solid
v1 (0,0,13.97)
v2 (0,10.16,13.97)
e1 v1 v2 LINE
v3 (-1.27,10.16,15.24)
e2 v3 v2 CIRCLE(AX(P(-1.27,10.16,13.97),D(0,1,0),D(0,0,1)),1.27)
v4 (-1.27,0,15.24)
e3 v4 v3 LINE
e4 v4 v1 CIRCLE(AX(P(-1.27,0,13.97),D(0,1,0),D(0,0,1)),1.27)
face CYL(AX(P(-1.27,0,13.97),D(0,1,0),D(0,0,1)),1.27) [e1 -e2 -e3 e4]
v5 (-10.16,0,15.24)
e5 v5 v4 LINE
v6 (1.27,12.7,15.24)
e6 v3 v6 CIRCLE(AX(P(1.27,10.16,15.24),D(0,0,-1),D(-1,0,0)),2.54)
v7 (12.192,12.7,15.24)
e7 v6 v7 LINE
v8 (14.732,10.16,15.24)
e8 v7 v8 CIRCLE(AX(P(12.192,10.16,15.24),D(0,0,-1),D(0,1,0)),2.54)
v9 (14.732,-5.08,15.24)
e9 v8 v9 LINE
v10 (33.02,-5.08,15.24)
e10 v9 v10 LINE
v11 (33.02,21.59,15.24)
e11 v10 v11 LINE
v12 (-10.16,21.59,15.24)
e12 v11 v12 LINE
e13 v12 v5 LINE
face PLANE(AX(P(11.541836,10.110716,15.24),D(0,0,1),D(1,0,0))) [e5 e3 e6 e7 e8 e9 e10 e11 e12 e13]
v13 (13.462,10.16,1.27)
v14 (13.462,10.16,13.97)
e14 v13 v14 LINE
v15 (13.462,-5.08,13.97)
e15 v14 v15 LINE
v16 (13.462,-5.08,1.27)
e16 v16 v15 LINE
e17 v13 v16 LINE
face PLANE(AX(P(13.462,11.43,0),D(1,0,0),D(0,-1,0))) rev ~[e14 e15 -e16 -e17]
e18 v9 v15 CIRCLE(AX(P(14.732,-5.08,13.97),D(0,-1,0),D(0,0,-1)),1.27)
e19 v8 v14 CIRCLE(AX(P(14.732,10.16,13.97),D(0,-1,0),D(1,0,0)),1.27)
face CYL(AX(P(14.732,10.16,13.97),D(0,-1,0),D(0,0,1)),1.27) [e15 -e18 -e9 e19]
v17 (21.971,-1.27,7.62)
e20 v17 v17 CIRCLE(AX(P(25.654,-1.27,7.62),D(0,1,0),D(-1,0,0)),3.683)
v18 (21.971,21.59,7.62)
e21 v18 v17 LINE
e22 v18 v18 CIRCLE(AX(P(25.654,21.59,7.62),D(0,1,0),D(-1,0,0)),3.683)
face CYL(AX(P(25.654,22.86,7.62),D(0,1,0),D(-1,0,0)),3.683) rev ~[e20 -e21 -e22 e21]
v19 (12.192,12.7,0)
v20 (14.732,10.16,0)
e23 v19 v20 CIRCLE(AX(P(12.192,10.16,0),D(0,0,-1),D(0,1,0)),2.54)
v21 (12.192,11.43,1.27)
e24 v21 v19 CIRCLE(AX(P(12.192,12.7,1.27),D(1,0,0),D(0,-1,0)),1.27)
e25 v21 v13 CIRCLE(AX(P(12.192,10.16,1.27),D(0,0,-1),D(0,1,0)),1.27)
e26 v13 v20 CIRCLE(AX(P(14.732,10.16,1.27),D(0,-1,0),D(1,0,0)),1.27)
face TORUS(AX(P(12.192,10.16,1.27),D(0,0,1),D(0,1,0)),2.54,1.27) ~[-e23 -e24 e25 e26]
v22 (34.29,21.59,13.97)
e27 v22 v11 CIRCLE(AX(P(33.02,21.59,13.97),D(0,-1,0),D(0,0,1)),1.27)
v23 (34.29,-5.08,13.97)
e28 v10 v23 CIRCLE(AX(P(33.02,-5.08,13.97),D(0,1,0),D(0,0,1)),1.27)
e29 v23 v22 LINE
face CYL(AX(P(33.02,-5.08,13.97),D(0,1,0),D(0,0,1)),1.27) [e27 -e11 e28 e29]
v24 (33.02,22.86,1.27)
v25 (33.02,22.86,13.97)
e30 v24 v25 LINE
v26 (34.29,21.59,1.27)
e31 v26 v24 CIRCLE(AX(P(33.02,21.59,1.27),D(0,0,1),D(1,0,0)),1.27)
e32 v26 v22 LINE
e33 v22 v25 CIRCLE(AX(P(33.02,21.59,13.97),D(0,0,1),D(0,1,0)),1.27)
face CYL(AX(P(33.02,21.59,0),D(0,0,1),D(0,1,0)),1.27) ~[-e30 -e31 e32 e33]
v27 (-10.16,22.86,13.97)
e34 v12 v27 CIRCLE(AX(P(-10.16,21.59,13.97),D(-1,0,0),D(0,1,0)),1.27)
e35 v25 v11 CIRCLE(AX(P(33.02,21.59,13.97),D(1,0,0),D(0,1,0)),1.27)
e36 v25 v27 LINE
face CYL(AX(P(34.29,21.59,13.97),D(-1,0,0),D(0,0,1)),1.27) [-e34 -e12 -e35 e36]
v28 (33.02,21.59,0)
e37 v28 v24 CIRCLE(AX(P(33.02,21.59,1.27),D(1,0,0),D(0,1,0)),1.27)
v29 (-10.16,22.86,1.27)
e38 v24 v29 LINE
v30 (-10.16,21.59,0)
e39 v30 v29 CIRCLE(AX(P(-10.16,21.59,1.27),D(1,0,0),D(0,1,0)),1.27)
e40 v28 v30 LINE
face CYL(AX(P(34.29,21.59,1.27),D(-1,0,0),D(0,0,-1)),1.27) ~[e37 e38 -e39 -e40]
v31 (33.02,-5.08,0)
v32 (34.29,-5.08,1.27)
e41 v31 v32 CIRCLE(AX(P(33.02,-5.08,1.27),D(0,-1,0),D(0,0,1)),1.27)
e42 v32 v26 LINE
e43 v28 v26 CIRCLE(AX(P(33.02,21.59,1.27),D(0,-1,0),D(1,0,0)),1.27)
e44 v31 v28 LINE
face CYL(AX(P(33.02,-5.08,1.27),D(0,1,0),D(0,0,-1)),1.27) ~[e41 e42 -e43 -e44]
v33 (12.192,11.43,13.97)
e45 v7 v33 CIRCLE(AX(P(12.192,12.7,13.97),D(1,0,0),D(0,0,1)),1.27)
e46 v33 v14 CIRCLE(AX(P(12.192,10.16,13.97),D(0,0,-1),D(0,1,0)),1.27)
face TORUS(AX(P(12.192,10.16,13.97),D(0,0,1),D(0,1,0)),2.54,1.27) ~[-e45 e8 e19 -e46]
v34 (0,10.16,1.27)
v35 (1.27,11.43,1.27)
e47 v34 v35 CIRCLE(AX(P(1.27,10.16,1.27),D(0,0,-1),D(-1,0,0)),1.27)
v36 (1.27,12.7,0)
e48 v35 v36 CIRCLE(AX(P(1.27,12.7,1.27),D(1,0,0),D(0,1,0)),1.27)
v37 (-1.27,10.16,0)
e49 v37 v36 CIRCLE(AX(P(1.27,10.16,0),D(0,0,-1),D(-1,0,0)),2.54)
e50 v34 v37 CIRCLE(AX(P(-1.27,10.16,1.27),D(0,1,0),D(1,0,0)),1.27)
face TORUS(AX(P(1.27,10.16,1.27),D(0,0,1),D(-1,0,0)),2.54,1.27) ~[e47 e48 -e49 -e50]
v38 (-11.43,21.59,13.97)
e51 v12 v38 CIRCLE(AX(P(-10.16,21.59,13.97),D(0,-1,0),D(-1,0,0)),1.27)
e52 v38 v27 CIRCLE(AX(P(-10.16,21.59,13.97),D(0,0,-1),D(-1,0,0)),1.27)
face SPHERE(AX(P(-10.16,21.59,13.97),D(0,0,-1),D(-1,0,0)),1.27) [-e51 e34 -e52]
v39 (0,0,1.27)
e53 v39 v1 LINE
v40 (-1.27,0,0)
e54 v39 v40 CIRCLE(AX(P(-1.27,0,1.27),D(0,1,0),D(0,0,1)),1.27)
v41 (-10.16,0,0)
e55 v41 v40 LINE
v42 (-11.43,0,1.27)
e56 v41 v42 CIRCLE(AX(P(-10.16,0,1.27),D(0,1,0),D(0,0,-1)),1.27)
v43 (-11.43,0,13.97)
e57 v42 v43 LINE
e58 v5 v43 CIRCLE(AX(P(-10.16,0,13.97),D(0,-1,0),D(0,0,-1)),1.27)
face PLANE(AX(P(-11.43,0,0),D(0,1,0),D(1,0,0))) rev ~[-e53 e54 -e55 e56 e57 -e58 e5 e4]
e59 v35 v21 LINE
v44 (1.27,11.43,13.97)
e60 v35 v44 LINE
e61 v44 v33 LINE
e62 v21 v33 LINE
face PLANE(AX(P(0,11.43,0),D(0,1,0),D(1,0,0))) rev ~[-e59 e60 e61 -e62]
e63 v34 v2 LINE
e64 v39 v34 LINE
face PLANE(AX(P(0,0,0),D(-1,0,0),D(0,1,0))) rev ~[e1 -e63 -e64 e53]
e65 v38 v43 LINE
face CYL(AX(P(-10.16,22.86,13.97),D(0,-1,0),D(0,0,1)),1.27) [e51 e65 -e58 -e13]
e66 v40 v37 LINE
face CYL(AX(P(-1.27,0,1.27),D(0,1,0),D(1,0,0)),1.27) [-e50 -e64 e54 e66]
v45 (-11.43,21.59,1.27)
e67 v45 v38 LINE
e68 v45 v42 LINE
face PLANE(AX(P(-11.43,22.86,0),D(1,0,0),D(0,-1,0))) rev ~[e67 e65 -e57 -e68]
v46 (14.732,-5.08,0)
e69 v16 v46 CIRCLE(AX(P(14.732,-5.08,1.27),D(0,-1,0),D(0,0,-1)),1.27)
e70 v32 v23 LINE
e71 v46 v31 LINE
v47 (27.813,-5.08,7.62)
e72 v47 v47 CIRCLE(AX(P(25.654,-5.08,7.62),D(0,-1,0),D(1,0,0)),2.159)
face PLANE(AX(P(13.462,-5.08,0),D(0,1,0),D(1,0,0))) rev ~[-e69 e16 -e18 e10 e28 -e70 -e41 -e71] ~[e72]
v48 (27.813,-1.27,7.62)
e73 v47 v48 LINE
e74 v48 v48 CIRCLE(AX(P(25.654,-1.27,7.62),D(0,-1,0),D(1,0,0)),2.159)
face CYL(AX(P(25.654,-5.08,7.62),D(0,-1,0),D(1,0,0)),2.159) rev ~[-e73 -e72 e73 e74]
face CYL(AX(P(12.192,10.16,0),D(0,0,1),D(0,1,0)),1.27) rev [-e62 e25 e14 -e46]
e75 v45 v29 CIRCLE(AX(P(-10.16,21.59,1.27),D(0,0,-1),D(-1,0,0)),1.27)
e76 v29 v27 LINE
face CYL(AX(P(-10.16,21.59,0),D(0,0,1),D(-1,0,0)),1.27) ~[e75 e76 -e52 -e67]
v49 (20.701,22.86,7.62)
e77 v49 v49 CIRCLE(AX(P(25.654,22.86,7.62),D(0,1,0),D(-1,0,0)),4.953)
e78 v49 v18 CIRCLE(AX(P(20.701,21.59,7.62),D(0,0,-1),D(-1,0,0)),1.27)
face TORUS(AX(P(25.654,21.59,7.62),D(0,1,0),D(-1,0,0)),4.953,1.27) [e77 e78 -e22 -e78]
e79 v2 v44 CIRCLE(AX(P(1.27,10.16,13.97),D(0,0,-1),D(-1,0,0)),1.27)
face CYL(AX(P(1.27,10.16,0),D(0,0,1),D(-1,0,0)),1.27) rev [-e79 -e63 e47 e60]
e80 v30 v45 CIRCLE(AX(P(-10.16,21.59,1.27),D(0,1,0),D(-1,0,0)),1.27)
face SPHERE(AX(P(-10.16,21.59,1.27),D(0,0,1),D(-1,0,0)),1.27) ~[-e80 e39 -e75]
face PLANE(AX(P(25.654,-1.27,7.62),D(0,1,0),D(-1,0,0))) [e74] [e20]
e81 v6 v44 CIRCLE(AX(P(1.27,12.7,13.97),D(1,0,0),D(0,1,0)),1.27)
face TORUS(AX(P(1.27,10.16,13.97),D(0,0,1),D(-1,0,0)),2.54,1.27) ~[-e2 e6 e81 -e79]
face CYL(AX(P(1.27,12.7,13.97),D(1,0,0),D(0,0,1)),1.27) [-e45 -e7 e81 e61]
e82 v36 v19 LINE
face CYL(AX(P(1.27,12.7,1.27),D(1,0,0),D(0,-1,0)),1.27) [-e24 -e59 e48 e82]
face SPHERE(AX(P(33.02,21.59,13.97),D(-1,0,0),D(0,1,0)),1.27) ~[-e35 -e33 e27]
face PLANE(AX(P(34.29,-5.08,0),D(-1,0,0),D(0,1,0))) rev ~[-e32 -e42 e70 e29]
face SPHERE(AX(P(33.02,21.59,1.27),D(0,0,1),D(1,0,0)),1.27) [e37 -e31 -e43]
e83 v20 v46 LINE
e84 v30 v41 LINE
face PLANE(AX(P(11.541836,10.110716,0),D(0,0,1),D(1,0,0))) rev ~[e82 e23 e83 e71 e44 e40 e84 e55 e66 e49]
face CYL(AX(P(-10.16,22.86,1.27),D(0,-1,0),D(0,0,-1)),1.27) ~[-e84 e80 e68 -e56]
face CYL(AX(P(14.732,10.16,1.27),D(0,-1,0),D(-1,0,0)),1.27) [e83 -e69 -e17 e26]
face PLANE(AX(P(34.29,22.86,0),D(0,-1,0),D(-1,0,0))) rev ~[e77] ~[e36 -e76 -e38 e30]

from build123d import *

# Parameters (mm, degrees)
F1_DEPTH = 15.24
F2_R     = 2.159
F3_DEPTH = 27.94
F4_R     = 3.683
F5_DEPTH = 24.13
F6_F1_R  = 1.27
F6_F2_R  = 1.27
F6_F3_R  = 1.27


with BuildPart() as f1:
    # F0 (on Top) → F1 (new body)
    with BuildSketch(Plane.XY):
        Polygon((-11.43, 0), (0, 0), (0, 11.43), (13.462, 11.43), (13.462, -5.08), (34.29, -5.08), (34.29, 22.86), (-11.43, 22.86), align=None)
    extrude(amount=F1_DEPTH)

    # F2 (on face) → F3 (cut, through all)
    with BuildSketch(Plane.XZ.offset(5.08)):
        with Locations((25.654, 7.62)):
            Circle(F2_R)
    extrude(amount=-F3_DEPTH, mode=Mode.SUBTRACT)

    # F4 (on face) → F5 (cut)
    with BuildSketch(Plane(origin=(0, 22.86, 0), x_dir=(-1, 0, 0), z_dir=(0, 1, 0))):
        with Locations((-25.654, 7.62)):
            Circle(F4_R)
    extrude(amount=-F5_DEPTH, mode=Mode.SUBTRACT)

    # F6: fillet of radius 1.27 on 14 edges, made by hand

    # F6_f1
    f6_f1_edges = [f1.edges().sort_by_distance(p)[0] for p in [
        (0, 11.43, 7.62),
        (13.462, 11.43, 7.62),
    ]]
    fillet(f6_f1_edges, radius=F6_F1_R)

    # F6_f2
    f6_f2_edges = [f1.edges().sort_by_distance(p)[0] for p in [
        (6.731, 11.43, 15.24),
        (-11.43, 22.86, 7.62),
        (-11.43, 11.43, 15.24),
        (-11.43, 11.43, 0),
        (11.43, 22.86, 15.24),
        (34.29, 22.86, 7.62),
        (34.29, 8.89, 15.24),
        (34.29, 8.89, 0),
        (11.43, 22.86, 0),
        (29.337, 22.86, 7.62),
        (0.3719743879, 11.0580256121, 15.24),
        (13.0900256121, 11.0580256121, 15.24),
    ]]
    fillet(f6_f2_edges, radius=F6_F2_R)

    # F6_f3
    f6_f3_edges = [f1.edges().sort_by_distance(p)[0] for p in [
        (0, 5.08, 0),
        (6.731, 11.43, 0),
        (0.3719743879, 11.0580256121, 0),
        (13.0900256121, 11.0580256121, 0),
    ]]
    fillet(f6_f3_edges, radius=F6_F3_R)


solid = f1.part
